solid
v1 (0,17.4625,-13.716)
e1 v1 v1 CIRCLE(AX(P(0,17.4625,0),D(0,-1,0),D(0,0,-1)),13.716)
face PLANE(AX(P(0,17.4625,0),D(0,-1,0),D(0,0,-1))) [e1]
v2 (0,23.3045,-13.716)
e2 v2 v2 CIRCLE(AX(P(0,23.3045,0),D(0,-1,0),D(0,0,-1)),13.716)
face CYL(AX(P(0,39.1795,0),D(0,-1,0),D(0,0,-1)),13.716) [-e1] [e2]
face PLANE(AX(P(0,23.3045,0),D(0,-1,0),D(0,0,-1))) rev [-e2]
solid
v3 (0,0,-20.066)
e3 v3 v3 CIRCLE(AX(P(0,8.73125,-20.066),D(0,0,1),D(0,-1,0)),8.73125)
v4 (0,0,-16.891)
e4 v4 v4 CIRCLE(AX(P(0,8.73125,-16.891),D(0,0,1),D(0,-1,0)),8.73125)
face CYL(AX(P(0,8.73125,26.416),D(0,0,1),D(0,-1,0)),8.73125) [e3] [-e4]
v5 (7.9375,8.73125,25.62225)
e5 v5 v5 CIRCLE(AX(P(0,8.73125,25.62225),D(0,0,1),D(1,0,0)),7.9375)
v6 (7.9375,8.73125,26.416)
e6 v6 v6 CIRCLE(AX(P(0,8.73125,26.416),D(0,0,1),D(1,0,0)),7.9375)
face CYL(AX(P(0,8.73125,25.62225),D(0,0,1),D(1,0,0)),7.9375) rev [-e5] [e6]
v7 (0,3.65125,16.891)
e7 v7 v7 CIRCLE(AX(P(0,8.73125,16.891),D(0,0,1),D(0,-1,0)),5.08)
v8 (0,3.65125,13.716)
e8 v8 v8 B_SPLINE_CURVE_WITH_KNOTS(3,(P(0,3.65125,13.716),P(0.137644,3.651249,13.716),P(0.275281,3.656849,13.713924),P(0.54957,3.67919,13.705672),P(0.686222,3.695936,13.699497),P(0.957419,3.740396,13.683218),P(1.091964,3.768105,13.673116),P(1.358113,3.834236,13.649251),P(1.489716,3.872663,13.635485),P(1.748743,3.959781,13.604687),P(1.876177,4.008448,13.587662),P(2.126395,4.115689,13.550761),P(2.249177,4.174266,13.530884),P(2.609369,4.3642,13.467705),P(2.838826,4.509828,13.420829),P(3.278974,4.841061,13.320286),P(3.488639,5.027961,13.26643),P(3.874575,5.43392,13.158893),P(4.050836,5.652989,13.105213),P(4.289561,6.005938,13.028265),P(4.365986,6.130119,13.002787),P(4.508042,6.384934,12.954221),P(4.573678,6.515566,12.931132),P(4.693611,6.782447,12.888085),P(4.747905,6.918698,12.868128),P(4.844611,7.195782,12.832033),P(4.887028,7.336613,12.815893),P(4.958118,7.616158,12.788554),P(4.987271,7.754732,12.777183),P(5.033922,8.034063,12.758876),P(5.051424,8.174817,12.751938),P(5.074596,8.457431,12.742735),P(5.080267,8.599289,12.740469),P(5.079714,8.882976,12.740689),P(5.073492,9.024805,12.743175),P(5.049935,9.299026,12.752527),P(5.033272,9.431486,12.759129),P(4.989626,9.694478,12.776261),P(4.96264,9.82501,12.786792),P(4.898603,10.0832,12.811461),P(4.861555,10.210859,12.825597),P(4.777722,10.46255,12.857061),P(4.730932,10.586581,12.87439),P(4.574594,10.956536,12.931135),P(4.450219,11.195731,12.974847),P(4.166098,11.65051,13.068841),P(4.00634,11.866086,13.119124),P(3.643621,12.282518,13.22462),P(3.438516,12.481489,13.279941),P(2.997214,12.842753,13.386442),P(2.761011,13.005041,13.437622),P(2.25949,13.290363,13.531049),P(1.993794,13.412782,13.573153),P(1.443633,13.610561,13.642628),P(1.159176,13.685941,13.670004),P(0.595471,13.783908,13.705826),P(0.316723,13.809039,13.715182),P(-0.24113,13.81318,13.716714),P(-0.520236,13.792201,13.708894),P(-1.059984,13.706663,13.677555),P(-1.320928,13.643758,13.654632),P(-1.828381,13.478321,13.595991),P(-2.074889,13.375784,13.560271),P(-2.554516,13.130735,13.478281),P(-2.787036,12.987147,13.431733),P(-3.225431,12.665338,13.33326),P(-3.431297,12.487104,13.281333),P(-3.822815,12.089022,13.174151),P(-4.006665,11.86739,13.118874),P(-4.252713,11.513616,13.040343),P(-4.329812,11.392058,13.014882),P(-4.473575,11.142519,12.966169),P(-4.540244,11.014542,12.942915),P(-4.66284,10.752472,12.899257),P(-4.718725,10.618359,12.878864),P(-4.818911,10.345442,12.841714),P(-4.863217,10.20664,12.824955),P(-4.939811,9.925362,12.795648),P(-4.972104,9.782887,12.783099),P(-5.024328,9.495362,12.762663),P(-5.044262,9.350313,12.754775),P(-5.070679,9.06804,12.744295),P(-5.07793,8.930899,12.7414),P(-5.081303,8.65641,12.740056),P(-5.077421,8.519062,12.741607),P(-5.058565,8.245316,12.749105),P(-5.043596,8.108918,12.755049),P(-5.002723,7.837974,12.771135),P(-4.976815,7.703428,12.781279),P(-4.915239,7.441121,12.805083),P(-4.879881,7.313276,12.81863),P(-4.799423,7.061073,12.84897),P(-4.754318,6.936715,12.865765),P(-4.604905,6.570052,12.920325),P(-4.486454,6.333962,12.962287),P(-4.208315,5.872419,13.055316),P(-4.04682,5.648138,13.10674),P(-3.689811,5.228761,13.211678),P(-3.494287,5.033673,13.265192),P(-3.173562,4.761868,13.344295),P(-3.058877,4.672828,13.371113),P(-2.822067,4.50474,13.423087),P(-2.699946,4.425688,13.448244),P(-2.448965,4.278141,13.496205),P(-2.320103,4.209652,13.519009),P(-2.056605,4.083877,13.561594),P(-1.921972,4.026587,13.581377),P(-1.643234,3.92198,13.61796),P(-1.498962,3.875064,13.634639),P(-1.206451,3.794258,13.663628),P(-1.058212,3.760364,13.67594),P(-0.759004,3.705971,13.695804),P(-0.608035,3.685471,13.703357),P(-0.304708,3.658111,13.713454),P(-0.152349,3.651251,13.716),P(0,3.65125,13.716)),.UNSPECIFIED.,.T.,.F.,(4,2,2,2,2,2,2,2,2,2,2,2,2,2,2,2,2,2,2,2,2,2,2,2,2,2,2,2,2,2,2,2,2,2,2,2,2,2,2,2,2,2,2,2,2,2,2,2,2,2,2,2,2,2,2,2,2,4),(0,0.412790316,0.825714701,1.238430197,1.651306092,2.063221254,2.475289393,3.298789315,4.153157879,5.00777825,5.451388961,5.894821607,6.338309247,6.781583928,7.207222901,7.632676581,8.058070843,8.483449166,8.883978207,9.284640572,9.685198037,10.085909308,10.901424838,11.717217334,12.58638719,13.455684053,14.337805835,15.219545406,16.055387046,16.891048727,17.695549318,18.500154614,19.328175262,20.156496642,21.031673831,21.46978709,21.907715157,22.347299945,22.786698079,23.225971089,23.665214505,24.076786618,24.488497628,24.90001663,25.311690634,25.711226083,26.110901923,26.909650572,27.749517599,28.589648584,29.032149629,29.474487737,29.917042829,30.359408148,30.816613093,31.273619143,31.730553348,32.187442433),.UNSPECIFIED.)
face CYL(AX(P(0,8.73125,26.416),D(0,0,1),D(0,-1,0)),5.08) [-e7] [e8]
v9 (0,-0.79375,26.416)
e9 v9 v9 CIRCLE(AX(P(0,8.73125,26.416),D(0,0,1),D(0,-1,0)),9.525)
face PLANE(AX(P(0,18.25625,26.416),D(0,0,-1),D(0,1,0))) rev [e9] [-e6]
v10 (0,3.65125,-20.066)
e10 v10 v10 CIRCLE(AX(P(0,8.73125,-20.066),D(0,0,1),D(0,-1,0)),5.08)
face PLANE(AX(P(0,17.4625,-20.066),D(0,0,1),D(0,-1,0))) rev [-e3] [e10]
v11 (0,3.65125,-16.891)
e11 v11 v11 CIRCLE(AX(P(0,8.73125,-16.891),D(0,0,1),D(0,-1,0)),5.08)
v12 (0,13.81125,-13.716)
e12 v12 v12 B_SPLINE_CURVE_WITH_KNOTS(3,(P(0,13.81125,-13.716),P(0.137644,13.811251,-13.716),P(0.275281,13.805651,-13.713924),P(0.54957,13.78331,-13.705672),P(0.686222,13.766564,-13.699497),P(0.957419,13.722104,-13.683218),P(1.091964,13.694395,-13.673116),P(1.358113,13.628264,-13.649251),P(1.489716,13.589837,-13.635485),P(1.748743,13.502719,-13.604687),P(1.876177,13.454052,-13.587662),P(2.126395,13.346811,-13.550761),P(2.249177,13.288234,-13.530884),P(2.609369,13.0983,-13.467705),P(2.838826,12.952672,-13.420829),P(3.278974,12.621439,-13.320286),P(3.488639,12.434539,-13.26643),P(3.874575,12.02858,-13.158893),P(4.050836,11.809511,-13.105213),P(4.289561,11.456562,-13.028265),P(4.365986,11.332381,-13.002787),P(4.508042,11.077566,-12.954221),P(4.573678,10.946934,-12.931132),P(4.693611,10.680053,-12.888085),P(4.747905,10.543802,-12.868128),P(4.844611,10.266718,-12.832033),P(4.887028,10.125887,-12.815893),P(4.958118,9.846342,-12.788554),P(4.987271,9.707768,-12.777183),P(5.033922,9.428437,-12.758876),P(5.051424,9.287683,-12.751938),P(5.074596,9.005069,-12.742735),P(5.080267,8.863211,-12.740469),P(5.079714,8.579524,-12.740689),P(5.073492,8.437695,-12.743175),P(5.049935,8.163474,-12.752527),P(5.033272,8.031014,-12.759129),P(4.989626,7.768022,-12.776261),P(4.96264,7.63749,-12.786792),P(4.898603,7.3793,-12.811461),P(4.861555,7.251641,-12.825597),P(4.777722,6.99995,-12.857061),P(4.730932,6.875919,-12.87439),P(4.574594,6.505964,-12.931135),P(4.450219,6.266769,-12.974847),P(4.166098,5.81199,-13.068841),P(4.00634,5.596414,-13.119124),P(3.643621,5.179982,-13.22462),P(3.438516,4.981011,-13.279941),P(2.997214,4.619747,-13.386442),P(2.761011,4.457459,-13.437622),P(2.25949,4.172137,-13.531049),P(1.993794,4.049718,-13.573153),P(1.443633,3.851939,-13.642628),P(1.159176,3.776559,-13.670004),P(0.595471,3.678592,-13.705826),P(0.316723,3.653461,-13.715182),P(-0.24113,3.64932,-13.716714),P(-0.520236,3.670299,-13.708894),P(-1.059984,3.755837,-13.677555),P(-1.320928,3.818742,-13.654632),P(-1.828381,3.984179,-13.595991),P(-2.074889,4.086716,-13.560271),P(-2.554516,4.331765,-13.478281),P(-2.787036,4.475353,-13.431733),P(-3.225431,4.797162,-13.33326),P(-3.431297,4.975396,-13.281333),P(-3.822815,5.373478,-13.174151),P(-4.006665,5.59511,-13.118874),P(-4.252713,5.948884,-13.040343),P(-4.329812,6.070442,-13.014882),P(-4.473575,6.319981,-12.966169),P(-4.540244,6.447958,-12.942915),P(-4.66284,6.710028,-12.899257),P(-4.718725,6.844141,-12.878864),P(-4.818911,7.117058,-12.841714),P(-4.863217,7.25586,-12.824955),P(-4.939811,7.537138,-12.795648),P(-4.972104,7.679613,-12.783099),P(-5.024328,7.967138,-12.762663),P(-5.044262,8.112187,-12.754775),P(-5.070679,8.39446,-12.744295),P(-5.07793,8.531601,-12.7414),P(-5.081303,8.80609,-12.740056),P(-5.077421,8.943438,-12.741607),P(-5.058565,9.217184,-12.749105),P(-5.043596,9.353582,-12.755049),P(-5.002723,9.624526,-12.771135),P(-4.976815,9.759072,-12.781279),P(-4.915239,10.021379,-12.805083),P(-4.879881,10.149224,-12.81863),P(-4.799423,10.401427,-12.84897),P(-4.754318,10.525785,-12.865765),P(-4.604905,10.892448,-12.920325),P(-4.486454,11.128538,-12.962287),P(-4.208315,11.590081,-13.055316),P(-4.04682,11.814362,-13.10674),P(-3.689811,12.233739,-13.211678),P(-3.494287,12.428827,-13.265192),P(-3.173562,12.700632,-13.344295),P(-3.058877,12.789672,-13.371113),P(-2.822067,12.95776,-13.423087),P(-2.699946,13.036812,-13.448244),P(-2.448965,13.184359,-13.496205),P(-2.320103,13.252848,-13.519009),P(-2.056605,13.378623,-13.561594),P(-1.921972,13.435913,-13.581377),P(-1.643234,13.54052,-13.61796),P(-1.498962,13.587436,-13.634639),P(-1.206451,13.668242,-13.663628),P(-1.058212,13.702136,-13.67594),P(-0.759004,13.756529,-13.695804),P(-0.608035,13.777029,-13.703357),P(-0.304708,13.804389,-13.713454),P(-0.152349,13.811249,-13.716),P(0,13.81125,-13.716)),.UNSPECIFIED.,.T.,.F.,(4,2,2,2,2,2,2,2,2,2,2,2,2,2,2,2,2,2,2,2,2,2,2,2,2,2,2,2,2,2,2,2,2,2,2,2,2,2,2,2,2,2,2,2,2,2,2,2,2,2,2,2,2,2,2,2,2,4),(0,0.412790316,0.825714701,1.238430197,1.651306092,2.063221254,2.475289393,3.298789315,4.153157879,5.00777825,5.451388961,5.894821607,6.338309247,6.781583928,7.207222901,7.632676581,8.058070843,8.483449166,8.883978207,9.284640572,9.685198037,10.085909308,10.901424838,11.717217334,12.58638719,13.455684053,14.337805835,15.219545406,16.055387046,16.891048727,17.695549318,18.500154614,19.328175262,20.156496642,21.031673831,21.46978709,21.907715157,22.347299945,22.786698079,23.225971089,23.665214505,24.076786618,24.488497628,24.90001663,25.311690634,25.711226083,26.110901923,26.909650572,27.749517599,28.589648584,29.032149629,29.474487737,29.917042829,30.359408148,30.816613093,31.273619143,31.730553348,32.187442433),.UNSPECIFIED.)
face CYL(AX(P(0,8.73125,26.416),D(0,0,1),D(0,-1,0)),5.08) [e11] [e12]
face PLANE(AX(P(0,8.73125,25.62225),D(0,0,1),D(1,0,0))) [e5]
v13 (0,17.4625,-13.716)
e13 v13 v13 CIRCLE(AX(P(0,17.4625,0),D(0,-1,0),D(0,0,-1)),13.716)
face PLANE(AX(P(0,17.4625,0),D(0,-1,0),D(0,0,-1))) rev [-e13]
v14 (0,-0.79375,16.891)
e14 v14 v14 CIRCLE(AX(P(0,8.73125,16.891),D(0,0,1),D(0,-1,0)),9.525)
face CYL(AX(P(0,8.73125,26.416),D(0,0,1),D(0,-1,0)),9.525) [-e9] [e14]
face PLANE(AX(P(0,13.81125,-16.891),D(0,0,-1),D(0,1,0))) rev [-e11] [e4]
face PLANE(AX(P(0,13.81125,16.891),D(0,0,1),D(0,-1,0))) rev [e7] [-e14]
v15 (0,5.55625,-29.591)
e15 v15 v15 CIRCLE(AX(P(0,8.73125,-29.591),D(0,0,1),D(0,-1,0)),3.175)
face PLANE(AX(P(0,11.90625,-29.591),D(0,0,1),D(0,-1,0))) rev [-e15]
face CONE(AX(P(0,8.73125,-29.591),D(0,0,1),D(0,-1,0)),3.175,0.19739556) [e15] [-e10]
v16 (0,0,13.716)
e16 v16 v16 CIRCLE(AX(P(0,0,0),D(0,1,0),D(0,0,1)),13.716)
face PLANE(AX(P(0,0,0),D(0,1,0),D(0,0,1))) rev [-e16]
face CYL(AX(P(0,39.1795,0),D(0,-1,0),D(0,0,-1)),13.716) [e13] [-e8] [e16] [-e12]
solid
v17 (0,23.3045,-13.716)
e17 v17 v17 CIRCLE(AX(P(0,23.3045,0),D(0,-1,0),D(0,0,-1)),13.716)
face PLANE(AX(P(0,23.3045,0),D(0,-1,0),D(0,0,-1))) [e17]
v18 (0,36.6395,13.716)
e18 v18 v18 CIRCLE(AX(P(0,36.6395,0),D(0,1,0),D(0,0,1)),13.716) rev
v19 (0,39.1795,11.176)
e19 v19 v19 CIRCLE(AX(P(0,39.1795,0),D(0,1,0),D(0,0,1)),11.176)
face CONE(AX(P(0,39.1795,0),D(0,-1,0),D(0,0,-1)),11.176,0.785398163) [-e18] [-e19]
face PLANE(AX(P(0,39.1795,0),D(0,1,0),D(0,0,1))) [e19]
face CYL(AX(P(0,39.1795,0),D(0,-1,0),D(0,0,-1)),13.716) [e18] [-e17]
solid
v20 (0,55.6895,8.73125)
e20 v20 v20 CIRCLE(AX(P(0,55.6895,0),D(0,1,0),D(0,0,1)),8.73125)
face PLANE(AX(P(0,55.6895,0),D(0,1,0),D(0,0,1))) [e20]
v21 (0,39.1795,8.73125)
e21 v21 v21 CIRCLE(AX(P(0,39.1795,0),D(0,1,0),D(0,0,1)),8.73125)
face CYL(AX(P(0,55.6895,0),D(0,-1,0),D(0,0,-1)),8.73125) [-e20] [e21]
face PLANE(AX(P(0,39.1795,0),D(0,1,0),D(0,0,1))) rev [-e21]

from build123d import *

# Parameters (mm, degrees)
SKETCH1_R           = 13.716
BOSS_EXTRUDE1_DEPTH = 39.1795
CHAMFER1_SIZE       = 2.54
SKETCH3_R           = 8.73125
BOSS_EXTRUDE3_DEPTH = 16.51
SKETCH5_R           = 7.9375
CUT_EXTRUDE1_DEPTH  = 0.79375


# Read off the part's stored shape, not the designer's step: Split3
with BuildPart() as part:
    # Sketch1 → Boss-Extrude1 (new body)
    with BuildSketch(Plane(origin=(0, 0, 0), x_dir=(1, 0, 0), z_dir=(0, 1, 0))):
        with Locations(Location((0, 0, 0), (0, 0, 270))):
            Circle(SKETCH1_R)
    extrude(amount=BOSS_EXTRUDE1_DEPTH)


with BuildPart() as body_2:
    # Split1: the piece on the far side of the plane
    add(part.part)
    split(bisect_by=Plane(origin=(0, 17.4625, 0), x_dir=(0, 0, -1), z_dir=(0, -1, 0)), keep=Keep.BOTTOM)

    # Chamfer1
    chamfer1_edges = [body_2.edges().sort_by_distance(p)[0] for p in [
        (0, 39.1795, -13.716),
    ]]
    chamfer(chamfer1_edges, length=CHAMFER1_SIZE)


with BuildPart() as part_1:
    add(part.part)

    # Split1
    split(bisect_by=Plane(origin=(0, 17.4625, 0), x_dir=(0, 0, -1), z_dir=(0, -1, 0)), keep=Keep.TOP)

    # Sketch4 → Revolve1 (revolve)
    with BuildSketch(Plane(origin=(0, 0, 0), x_dir=(0, 0, -1), z_dir=(1, 0, 0)), mode=Mode.PRIVATE) as revolve1_sk:
        Polygon((-6.858, 8.73125), (-6.858, 13.81125), (-16.891, 13.81125), (-16.891, 18.25625), (-26.416, 18.25625), (-26.416, 8.73125), align=None)
        Polygon((6.858, 8.73125), (6.858, 13.81125), (16.891, 13.81125), (16.891, 17.4625), (20.066, 17.4625), (20.066, 13.81125), (29.591, 11.90625), (29.591, 8.73125), align=None)
    revolve(revolve1_sk.sketch.rotate(Axis((0, 8.73125, 26.416), (0, 0, -1)), 180), axis=Axis((0, 8.73125, 26.416), (0, 0, -1)))

    # Sketch5 → Cut-Extrude1 (cut)
    with BuildSketch(Plane.XY.offset(26.416)):
        with Locations((0, 8.73125)):
            Circle(SKETCH5_R)
    extrude(amount=-CUT_EXTRUDE1_DEPTH, mode=Mode.SUBTRACT)


with BuildPart() as body_3:
    # Sketch3 → Boss-Extrude3 (new body)
    with BuildSketch(Plane(origin=(0, 39.1795, 0), x_dir=(1, 0, 0), z_dir=(0, 1, 0))):
        with Locations(Location((0, 0, 0), (0, 0, 270))):
            Circle(SKETCH3_R)
    extrude(amount=BOSS_EXTRUDE3_DEPTH)


with BuildPart() as body_4:
    # Split3: the piece on the far side of the plane
    add(body_2.part)
    split(bisect_by=Plane(origin=(0, 23.3045, 0), x_dir=(1, 0, 0), z_dir=(0, 1, 0)), keep=Keep.BOTTOM)


with BuildPart() as body_2_1:
    add(body_2.part)

    # Split3
    split(bisect_by=Plane(origin=(0, 23.3045, 0), x_dir=(1, 0, 0), z_dir=(0, 1, 0)), keep=Keep.TOP)


solid = Compound([part_1.part, body_3.part, body_4.part, body_2_1.part])
